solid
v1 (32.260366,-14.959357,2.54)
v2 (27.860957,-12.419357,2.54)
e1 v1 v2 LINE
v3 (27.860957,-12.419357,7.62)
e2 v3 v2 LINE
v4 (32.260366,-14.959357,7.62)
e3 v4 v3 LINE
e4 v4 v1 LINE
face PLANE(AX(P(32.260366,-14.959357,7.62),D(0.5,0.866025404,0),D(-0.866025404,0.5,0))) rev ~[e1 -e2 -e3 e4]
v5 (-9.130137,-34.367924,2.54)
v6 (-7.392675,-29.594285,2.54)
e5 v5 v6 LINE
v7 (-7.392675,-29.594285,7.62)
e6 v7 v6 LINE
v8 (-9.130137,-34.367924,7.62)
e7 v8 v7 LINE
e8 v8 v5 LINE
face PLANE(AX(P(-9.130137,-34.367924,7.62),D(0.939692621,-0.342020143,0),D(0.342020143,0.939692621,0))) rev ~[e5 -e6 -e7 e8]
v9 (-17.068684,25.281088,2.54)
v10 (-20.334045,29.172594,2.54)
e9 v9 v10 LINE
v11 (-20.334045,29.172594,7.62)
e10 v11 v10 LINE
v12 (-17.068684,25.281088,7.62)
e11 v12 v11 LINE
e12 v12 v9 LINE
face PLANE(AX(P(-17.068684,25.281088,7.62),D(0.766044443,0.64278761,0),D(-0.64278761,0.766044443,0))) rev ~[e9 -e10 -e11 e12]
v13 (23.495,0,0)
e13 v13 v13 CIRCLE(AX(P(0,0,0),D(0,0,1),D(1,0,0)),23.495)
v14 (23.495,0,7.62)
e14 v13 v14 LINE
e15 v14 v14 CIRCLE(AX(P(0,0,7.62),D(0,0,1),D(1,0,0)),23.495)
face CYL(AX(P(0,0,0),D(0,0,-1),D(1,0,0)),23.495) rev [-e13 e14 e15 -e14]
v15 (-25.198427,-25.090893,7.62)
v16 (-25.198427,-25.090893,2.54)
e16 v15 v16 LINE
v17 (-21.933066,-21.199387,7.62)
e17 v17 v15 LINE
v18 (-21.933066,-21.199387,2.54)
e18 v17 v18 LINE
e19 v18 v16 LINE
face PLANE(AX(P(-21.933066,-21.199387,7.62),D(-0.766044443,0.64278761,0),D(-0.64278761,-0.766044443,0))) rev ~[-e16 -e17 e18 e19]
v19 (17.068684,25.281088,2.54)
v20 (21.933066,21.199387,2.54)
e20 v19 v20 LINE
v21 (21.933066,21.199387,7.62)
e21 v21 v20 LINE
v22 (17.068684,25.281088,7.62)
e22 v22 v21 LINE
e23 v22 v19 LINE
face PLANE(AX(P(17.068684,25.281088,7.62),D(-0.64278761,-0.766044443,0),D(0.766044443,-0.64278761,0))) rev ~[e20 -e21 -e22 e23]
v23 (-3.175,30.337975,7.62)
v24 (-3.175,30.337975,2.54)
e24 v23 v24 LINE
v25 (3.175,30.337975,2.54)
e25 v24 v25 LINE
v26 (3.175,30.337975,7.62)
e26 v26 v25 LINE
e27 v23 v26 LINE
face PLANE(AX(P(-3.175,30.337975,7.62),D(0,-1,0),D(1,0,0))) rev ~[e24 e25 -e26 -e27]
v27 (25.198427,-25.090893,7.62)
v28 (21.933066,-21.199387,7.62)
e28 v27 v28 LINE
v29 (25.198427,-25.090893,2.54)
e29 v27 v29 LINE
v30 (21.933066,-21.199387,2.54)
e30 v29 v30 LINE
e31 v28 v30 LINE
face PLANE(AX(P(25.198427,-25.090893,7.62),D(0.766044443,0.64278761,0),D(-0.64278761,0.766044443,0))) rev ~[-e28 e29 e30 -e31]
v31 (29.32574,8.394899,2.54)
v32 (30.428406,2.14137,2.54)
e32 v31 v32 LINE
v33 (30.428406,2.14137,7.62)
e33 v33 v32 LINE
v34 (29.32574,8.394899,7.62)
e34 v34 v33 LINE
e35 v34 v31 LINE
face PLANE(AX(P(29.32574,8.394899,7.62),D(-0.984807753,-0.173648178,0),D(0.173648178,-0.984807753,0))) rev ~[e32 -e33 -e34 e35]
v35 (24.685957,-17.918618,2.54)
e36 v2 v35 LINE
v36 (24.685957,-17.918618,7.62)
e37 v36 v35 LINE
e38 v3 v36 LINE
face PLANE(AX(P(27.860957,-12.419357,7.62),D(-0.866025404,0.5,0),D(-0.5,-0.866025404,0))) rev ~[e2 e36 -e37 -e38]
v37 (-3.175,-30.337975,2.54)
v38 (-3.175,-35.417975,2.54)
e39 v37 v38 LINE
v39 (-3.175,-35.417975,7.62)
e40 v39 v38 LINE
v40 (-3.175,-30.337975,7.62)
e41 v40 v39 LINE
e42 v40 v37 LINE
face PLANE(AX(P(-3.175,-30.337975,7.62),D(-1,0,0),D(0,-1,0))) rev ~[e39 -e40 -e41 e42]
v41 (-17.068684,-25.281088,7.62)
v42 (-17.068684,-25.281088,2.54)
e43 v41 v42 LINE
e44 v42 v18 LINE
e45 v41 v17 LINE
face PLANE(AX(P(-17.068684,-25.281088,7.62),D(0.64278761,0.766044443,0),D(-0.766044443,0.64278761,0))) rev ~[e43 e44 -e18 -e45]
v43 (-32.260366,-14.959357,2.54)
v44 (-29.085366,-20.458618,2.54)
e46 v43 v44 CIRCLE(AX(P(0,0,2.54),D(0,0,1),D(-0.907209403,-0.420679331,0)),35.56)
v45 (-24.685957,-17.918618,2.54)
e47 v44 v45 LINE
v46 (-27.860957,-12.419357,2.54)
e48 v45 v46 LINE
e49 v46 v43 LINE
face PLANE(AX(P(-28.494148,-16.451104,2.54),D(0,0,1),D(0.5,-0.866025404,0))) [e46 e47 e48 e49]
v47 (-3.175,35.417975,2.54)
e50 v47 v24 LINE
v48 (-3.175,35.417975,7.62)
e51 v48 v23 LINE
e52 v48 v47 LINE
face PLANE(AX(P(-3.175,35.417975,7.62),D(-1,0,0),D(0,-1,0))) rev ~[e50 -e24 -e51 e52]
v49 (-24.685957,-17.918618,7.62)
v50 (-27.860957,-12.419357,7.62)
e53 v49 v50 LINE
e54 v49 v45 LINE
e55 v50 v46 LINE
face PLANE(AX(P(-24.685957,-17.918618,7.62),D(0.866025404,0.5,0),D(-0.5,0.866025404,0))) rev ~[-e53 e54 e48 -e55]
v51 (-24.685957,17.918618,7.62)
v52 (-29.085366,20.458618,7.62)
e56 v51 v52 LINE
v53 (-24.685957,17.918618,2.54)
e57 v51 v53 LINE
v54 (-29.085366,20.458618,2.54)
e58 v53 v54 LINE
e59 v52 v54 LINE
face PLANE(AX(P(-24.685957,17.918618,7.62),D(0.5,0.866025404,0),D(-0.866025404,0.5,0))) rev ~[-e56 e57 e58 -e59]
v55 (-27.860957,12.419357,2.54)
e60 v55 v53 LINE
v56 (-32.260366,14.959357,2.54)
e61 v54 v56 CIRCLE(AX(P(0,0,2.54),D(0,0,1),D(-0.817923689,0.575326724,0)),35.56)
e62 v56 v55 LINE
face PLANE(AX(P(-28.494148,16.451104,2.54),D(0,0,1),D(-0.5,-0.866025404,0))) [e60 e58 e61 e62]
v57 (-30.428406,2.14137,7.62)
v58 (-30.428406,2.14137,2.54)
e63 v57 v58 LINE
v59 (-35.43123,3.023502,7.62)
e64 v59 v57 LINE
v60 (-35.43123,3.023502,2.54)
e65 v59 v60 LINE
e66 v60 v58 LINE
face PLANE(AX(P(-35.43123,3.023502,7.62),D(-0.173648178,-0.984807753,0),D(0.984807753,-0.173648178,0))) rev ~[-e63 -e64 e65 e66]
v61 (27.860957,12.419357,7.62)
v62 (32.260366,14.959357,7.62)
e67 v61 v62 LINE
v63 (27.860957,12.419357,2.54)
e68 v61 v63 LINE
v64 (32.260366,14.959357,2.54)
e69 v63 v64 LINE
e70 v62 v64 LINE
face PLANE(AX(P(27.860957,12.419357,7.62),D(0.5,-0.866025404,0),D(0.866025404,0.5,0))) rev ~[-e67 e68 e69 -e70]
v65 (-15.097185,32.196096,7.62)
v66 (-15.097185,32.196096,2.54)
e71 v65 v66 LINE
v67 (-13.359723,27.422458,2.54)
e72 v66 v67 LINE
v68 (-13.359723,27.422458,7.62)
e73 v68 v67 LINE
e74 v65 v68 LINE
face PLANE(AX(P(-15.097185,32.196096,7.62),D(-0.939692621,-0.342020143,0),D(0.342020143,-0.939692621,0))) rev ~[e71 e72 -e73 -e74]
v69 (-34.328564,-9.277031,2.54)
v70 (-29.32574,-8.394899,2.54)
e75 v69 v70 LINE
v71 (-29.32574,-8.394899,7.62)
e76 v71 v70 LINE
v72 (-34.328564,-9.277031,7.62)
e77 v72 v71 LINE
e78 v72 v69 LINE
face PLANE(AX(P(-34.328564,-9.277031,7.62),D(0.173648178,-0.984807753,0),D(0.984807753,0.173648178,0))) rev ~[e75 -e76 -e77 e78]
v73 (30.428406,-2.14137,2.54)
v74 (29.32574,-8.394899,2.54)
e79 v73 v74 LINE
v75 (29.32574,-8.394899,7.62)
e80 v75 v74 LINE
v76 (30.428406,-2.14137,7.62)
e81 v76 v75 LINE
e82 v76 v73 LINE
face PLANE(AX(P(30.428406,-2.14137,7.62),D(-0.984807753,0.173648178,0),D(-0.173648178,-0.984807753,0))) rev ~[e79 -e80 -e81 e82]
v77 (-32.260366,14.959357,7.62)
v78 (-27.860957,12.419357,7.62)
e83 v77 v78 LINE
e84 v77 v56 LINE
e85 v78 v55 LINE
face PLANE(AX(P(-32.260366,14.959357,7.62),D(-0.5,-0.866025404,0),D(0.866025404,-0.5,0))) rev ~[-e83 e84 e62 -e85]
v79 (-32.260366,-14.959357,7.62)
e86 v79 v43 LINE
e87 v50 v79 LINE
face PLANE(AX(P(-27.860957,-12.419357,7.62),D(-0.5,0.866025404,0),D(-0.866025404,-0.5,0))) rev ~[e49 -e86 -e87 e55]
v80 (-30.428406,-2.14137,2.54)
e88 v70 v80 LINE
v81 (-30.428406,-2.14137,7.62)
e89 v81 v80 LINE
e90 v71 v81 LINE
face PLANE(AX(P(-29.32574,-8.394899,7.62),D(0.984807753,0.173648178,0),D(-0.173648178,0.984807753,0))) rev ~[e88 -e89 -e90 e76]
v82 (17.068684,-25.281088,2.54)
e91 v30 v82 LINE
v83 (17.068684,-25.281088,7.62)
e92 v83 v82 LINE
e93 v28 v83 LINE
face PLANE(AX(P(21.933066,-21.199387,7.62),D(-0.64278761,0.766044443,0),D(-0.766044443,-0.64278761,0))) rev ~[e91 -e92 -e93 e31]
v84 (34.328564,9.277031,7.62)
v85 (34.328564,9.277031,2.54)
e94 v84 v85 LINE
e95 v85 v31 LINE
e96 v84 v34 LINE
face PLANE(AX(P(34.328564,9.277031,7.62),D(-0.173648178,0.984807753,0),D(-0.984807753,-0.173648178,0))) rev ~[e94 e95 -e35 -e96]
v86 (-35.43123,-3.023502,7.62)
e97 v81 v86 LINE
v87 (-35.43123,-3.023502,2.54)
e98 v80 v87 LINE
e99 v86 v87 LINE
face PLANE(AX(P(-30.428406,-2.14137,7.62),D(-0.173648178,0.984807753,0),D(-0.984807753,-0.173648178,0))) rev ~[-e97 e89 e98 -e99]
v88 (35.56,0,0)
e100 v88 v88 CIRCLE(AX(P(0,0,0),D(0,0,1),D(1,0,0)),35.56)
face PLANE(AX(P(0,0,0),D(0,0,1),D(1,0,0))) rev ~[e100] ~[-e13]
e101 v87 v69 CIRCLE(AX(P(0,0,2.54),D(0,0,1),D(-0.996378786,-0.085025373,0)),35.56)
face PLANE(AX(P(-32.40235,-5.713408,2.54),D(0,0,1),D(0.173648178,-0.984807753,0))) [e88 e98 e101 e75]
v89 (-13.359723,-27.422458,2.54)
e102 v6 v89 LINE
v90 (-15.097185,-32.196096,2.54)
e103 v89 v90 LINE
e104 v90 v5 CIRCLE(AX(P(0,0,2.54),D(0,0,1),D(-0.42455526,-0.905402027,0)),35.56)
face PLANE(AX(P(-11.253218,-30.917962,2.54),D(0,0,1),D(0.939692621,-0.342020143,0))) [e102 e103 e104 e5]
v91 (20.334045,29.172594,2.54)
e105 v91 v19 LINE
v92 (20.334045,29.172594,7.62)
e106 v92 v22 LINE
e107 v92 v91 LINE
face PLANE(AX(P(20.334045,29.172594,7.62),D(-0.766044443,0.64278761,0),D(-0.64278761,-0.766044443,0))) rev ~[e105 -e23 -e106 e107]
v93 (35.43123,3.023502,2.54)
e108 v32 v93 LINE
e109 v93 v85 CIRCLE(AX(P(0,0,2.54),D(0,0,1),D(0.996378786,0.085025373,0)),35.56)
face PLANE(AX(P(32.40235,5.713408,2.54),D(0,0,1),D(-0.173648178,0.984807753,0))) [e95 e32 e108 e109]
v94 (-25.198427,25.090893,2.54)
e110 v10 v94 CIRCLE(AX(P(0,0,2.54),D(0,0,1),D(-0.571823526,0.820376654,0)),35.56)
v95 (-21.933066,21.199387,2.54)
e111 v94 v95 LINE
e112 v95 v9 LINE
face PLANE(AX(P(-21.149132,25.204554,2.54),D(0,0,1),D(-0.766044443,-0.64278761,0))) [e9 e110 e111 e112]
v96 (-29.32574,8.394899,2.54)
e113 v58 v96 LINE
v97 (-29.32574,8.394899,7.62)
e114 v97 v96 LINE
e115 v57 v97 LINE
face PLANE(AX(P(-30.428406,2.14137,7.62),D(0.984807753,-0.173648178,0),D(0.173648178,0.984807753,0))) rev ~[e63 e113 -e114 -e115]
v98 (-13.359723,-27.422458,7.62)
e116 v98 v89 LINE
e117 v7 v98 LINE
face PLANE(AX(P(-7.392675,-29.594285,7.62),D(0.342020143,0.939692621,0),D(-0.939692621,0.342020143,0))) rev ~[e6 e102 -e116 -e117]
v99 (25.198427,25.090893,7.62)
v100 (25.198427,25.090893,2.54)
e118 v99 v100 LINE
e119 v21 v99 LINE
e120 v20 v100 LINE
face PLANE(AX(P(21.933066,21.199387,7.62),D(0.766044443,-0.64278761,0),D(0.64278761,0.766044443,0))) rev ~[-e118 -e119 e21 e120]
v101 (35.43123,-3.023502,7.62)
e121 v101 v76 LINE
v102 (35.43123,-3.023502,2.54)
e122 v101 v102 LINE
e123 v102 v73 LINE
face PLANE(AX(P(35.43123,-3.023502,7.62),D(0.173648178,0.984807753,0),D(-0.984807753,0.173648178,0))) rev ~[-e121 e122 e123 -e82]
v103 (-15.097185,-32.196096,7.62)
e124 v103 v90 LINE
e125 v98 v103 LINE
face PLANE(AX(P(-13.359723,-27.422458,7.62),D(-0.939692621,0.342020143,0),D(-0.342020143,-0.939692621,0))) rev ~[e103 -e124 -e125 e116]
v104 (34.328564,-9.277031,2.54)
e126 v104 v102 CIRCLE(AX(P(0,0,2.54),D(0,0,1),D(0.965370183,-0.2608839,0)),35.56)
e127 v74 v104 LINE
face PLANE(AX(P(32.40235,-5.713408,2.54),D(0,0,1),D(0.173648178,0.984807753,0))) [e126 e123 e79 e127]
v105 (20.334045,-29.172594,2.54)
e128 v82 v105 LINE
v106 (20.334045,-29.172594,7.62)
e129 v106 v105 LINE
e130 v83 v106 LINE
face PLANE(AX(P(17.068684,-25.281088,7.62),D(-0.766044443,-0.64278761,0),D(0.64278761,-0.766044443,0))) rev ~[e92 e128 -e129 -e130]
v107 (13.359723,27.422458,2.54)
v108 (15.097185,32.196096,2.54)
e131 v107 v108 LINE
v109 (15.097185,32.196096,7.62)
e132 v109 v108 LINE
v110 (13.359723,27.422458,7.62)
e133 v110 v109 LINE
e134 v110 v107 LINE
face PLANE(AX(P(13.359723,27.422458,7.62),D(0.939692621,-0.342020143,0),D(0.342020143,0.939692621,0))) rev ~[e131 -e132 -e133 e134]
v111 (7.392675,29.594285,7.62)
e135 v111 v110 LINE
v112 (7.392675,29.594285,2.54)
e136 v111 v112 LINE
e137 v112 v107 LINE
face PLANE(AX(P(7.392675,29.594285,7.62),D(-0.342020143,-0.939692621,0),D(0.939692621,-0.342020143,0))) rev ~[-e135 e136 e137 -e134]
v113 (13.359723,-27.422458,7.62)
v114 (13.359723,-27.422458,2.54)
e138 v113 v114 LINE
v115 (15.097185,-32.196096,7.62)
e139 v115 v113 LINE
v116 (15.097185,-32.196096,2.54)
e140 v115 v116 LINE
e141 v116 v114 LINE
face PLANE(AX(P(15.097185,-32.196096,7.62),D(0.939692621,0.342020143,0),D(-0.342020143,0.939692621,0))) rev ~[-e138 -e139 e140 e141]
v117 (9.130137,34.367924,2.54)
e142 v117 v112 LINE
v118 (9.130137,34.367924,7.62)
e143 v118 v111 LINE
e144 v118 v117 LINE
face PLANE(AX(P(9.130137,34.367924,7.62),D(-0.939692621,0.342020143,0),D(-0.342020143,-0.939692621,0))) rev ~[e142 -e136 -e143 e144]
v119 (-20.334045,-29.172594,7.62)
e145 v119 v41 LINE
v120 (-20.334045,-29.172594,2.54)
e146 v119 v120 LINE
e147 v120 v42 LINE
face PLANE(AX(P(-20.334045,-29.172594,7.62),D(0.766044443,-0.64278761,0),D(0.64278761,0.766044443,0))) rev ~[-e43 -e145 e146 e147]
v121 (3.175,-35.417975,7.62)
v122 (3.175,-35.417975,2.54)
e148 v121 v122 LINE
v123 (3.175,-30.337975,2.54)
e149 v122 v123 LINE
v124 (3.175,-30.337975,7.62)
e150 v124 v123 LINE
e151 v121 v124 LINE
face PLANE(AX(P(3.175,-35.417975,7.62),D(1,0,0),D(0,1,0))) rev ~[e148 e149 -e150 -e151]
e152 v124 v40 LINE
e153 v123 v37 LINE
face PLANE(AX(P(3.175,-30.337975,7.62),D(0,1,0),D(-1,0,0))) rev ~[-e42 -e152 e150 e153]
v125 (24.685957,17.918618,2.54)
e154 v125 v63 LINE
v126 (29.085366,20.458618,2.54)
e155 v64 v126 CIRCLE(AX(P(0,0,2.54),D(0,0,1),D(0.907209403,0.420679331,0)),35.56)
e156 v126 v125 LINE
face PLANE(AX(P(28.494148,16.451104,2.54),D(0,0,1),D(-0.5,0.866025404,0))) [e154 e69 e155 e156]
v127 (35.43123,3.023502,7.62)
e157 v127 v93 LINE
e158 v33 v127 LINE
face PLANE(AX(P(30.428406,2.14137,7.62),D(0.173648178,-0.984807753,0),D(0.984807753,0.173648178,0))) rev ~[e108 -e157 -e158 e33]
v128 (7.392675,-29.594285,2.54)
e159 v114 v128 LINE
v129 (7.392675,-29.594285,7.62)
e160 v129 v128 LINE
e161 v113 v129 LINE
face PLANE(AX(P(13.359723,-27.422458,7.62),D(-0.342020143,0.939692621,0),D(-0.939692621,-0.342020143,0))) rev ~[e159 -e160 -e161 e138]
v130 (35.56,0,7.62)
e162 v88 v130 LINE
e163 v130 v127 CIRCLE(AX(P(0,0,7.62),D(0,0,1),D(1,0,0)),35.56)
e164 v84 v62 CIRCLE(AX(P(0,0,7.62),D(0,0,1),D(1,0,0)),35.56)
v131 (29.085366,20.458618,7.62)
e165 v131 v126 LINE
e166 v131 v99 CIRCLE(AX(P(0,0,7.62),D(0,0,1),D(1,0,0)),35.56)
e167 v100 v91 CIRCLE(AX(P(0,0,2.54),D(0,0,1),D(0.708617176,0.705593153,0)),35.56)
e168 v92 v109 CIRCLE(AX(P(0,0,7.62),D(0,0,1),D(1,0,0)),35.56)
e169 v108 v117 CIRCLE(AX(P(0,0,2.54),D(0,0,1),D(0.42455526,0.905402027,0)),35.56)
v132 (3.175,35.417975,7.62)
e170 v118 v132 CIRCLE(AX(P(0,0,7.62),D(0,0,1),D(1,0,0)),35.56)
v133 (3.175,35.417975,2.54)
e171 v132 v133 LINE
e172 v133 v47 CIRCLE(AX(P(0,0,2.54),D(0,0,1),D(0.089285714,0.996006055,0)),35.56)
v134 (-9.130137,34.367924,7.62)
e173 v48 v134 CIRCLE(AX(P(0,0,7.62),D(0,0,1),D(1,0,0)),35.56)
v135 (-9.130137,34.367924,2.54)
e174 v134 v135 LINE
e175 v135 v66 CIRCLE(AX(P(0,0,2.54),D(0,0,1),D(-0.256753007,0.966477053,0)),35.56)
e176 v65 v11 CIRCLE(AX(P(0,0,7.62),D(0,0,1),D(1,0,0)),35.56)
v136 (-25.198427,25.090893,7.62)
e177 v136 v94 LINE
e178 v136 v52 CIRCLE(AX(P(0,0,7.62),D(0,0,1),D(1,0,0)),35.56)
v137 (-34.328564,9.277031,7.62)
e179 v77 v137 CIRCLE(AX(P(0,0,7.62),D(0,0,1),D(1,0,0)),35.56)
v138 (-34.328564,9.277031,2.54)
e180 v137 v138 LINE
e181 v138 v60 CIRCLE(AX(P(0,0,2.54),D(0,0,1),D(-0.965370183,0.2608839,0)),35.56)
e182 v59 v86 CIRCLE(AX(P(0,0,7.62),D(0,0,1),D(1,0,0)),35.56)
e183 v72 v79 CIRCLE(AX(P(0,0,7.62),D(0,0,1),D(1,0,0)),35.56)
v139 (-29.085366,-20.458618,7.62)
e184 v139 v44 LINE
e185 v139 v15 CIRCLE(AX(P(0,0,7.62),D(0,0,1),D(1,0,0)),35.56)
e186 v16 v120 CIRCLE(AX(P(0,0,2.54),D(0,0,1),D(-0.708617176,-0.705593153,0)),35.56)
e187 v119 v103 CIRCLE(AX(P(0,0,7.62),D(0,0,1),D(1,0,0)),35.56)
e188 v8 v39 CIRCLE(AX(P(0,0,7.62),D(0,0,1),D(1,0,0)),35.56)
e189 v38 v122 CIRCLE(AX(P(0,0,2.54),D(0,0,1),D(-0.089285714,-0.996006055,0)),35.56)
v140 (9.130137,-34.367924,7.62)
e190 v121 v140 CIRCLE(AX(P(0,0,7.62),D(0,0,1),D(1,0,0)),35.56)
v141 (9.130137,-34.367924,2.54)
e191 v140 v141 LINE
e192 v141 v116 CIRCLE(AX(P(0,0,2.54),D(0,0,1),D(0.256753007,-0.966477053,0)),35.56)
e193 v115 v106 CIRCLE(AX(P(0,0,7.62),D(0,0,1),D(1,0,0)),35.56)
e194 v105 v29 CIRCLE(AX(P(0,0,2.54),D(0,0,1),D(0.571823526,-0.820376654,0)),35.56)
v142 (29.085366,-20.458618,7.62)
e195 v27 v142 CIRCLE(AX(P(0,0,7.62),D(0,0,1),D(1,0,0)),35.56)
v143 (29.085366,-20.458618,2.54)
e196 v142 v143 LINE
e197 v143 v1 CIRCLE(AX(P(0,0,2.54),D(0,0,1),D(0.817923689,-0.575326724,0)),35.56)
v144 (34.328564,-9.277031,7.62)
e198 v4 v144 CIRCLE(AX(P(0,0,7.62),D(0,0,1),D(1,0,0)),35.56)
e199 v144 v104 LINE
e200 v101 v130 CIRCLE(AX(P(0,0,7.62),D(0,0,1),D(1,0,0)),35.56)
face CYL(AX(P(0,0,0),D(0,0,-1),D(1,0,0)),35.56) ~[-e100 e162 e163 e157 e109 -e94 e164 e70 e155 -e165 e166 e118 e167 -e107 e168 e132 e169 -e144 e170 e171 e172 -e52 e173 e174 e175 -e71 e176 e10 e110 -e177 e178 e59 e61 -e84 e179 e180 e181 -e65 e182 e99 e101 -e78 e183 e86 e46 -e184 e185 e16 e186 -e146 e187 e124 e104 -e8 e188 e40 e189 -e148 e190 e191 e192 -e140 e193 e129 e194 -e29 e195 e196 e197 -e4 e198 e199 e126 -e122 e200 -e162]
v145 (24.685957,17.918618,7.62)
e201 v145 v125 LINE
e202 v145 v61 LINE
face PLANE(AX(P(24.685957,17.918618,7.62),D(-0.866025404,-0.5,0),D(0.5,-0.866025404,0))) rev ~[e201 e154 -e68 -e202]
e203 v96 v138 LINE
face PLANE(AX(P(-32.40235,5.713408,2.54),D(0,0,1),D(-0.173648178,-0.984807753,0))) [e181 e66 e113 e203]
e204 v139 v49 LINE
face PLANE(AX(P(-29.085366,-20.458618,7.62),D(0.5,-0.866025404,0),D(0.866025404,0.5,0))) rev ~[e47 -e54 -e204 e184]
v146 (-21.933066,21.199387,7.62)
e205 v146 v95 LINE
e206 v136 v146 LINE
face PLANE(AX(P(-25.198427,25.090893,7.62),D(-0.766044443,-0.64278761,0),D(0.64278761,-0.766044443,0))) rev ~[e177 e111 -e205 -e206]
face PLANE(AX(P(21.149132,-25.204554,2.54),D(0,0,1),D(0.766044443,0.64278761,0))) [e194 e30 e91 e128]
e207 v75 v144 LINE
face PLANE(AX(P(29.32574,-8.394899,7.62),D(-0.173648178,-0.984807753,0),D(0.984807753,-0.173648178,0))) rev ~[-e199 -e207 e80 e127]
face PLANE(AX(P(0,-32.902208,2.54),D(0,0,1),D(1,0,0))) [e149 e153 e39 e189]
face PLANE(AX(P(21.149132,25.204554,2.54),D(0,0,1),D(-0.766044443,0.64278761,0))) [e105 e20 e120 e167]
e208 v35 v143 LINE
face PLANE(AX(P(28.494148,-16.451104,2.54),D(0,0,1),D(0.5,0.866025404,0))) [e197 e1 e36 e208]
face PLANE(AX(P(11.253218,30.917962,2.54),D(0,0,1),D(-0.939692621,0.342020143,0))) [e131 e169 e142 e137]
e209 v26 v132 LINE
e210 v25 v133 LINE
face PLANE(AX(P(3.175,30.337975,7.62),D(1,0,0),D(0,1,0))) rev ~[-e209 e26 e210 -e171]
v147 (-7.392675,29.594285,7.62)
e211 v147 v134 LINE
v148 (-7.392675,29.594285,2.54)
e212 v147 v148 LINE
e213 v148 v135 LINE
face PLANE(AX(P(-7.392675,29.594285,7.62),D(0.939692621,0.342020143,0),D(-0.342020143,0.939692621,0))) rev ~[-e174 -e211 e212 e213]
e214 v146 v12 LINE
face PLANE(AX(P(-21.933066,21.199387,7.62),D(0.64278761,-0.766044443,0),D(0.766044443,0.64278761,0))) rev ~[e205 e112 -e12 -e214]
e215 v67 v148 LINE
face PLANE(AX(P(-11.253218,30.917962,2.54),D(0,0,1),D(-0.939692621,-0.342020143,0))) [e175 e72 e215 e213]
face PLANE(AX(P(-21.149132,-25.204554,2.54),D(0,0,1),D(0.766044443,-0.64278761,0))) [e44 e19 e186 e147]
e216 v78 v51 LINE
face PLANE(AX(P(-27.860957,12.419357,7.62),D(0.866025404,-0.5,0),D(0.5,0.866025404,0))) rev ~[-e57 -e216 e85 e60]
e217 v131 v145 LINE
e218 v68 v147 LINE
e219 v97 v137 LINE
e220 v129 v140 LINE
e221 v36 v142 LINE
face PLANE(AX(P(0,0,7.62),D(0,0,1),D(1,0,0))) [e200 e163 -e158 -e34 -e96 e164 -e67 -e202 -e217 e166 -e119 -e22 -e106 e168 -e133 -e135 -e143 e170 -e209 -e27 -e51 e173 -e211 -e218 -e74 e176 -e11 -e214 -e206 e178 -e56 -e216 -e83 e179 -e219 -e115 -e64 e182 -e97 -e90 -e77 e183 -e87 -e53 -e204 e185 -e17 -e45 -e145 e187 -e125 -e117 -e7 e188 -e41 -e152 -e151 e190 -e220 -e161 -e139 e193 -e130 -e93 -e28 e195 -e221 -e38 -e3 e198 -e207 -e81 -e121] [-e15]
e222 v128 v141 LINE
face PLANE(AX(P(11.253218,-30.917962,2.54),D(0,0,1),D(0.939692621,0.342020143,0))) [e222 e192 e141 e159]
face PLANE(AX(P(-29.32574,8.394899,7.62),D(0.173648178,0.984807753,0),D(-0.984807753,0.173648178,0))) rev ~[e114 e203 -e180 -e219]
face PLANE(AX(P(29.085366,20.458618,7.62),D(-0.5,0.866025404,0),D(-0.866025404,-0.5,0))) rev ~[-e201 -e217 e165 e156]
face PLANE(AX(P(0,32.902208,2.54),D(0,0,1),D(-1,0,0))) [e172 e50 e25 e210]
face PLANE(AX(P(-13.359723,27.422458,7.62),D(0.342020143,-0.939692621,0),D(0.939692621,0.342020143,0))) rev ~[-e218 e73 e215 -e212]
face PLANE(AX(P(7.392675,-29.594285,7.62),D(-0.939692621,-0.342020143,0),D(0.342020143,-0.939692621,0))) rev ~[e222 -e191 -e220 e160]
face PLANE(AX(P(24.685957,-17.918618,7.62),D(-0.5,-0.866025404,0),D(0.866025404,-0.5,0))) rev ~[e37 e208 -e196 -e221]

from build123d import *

# Parameters (mm, degrees)
F0_R            = 35.56
F0_R_2          = 23.495
F1_DEPTH        = 7.62
F3_DEPTH        = 5.08
F3_COPIES_COUNT = 18


# Not quite as in the source:
# - a pattern or mirror of a feature is missing from the dataset's text; its kind, count and spacing are read off the source's solid


with BuildPart() as f1:
    # F0 (on Top) → F1 (new body)
    with BuildSketch(Plane.XY):
        Circle(F0_R)
        Circle(F0_R_2, mode=Mode.SUBTRACT)
    extrude(amount=F1_DEPTH)

    # F2 (on face) → F3 (cut)
    with BuildSketch(Plane.XY.offset(7.62)):
        with BuildLine():
            Line((-3.175, -30.3379753092), (-3.175, -35.4179753092))
            ThreePointArc((-3.175, -35.4179753092), (0, -35.56), (3.175, -35.4179753092))
            Line((3.175, -35.4179753092), (3.175, -30.3379753092))
            Line((3.175, -30.3379753092), (-3.175, -30.3379753092))
        make_face()
    f3 = extrude(amount=-F3_DEPTH, mode=Mode.SUBTRACT)

    # F3_copies: F3 ×18 about axis
    f3_copies_axis = Axis((0, 0, 0), (0, 0, 1))
    for i in range(1, F3_COPIES_COUNT):
        add(f3.rotate(f3_copies_axis, i * 360 / F3_COPIES_COUNT), mode=Mode.SUBTRACT)


solid = f1.part
